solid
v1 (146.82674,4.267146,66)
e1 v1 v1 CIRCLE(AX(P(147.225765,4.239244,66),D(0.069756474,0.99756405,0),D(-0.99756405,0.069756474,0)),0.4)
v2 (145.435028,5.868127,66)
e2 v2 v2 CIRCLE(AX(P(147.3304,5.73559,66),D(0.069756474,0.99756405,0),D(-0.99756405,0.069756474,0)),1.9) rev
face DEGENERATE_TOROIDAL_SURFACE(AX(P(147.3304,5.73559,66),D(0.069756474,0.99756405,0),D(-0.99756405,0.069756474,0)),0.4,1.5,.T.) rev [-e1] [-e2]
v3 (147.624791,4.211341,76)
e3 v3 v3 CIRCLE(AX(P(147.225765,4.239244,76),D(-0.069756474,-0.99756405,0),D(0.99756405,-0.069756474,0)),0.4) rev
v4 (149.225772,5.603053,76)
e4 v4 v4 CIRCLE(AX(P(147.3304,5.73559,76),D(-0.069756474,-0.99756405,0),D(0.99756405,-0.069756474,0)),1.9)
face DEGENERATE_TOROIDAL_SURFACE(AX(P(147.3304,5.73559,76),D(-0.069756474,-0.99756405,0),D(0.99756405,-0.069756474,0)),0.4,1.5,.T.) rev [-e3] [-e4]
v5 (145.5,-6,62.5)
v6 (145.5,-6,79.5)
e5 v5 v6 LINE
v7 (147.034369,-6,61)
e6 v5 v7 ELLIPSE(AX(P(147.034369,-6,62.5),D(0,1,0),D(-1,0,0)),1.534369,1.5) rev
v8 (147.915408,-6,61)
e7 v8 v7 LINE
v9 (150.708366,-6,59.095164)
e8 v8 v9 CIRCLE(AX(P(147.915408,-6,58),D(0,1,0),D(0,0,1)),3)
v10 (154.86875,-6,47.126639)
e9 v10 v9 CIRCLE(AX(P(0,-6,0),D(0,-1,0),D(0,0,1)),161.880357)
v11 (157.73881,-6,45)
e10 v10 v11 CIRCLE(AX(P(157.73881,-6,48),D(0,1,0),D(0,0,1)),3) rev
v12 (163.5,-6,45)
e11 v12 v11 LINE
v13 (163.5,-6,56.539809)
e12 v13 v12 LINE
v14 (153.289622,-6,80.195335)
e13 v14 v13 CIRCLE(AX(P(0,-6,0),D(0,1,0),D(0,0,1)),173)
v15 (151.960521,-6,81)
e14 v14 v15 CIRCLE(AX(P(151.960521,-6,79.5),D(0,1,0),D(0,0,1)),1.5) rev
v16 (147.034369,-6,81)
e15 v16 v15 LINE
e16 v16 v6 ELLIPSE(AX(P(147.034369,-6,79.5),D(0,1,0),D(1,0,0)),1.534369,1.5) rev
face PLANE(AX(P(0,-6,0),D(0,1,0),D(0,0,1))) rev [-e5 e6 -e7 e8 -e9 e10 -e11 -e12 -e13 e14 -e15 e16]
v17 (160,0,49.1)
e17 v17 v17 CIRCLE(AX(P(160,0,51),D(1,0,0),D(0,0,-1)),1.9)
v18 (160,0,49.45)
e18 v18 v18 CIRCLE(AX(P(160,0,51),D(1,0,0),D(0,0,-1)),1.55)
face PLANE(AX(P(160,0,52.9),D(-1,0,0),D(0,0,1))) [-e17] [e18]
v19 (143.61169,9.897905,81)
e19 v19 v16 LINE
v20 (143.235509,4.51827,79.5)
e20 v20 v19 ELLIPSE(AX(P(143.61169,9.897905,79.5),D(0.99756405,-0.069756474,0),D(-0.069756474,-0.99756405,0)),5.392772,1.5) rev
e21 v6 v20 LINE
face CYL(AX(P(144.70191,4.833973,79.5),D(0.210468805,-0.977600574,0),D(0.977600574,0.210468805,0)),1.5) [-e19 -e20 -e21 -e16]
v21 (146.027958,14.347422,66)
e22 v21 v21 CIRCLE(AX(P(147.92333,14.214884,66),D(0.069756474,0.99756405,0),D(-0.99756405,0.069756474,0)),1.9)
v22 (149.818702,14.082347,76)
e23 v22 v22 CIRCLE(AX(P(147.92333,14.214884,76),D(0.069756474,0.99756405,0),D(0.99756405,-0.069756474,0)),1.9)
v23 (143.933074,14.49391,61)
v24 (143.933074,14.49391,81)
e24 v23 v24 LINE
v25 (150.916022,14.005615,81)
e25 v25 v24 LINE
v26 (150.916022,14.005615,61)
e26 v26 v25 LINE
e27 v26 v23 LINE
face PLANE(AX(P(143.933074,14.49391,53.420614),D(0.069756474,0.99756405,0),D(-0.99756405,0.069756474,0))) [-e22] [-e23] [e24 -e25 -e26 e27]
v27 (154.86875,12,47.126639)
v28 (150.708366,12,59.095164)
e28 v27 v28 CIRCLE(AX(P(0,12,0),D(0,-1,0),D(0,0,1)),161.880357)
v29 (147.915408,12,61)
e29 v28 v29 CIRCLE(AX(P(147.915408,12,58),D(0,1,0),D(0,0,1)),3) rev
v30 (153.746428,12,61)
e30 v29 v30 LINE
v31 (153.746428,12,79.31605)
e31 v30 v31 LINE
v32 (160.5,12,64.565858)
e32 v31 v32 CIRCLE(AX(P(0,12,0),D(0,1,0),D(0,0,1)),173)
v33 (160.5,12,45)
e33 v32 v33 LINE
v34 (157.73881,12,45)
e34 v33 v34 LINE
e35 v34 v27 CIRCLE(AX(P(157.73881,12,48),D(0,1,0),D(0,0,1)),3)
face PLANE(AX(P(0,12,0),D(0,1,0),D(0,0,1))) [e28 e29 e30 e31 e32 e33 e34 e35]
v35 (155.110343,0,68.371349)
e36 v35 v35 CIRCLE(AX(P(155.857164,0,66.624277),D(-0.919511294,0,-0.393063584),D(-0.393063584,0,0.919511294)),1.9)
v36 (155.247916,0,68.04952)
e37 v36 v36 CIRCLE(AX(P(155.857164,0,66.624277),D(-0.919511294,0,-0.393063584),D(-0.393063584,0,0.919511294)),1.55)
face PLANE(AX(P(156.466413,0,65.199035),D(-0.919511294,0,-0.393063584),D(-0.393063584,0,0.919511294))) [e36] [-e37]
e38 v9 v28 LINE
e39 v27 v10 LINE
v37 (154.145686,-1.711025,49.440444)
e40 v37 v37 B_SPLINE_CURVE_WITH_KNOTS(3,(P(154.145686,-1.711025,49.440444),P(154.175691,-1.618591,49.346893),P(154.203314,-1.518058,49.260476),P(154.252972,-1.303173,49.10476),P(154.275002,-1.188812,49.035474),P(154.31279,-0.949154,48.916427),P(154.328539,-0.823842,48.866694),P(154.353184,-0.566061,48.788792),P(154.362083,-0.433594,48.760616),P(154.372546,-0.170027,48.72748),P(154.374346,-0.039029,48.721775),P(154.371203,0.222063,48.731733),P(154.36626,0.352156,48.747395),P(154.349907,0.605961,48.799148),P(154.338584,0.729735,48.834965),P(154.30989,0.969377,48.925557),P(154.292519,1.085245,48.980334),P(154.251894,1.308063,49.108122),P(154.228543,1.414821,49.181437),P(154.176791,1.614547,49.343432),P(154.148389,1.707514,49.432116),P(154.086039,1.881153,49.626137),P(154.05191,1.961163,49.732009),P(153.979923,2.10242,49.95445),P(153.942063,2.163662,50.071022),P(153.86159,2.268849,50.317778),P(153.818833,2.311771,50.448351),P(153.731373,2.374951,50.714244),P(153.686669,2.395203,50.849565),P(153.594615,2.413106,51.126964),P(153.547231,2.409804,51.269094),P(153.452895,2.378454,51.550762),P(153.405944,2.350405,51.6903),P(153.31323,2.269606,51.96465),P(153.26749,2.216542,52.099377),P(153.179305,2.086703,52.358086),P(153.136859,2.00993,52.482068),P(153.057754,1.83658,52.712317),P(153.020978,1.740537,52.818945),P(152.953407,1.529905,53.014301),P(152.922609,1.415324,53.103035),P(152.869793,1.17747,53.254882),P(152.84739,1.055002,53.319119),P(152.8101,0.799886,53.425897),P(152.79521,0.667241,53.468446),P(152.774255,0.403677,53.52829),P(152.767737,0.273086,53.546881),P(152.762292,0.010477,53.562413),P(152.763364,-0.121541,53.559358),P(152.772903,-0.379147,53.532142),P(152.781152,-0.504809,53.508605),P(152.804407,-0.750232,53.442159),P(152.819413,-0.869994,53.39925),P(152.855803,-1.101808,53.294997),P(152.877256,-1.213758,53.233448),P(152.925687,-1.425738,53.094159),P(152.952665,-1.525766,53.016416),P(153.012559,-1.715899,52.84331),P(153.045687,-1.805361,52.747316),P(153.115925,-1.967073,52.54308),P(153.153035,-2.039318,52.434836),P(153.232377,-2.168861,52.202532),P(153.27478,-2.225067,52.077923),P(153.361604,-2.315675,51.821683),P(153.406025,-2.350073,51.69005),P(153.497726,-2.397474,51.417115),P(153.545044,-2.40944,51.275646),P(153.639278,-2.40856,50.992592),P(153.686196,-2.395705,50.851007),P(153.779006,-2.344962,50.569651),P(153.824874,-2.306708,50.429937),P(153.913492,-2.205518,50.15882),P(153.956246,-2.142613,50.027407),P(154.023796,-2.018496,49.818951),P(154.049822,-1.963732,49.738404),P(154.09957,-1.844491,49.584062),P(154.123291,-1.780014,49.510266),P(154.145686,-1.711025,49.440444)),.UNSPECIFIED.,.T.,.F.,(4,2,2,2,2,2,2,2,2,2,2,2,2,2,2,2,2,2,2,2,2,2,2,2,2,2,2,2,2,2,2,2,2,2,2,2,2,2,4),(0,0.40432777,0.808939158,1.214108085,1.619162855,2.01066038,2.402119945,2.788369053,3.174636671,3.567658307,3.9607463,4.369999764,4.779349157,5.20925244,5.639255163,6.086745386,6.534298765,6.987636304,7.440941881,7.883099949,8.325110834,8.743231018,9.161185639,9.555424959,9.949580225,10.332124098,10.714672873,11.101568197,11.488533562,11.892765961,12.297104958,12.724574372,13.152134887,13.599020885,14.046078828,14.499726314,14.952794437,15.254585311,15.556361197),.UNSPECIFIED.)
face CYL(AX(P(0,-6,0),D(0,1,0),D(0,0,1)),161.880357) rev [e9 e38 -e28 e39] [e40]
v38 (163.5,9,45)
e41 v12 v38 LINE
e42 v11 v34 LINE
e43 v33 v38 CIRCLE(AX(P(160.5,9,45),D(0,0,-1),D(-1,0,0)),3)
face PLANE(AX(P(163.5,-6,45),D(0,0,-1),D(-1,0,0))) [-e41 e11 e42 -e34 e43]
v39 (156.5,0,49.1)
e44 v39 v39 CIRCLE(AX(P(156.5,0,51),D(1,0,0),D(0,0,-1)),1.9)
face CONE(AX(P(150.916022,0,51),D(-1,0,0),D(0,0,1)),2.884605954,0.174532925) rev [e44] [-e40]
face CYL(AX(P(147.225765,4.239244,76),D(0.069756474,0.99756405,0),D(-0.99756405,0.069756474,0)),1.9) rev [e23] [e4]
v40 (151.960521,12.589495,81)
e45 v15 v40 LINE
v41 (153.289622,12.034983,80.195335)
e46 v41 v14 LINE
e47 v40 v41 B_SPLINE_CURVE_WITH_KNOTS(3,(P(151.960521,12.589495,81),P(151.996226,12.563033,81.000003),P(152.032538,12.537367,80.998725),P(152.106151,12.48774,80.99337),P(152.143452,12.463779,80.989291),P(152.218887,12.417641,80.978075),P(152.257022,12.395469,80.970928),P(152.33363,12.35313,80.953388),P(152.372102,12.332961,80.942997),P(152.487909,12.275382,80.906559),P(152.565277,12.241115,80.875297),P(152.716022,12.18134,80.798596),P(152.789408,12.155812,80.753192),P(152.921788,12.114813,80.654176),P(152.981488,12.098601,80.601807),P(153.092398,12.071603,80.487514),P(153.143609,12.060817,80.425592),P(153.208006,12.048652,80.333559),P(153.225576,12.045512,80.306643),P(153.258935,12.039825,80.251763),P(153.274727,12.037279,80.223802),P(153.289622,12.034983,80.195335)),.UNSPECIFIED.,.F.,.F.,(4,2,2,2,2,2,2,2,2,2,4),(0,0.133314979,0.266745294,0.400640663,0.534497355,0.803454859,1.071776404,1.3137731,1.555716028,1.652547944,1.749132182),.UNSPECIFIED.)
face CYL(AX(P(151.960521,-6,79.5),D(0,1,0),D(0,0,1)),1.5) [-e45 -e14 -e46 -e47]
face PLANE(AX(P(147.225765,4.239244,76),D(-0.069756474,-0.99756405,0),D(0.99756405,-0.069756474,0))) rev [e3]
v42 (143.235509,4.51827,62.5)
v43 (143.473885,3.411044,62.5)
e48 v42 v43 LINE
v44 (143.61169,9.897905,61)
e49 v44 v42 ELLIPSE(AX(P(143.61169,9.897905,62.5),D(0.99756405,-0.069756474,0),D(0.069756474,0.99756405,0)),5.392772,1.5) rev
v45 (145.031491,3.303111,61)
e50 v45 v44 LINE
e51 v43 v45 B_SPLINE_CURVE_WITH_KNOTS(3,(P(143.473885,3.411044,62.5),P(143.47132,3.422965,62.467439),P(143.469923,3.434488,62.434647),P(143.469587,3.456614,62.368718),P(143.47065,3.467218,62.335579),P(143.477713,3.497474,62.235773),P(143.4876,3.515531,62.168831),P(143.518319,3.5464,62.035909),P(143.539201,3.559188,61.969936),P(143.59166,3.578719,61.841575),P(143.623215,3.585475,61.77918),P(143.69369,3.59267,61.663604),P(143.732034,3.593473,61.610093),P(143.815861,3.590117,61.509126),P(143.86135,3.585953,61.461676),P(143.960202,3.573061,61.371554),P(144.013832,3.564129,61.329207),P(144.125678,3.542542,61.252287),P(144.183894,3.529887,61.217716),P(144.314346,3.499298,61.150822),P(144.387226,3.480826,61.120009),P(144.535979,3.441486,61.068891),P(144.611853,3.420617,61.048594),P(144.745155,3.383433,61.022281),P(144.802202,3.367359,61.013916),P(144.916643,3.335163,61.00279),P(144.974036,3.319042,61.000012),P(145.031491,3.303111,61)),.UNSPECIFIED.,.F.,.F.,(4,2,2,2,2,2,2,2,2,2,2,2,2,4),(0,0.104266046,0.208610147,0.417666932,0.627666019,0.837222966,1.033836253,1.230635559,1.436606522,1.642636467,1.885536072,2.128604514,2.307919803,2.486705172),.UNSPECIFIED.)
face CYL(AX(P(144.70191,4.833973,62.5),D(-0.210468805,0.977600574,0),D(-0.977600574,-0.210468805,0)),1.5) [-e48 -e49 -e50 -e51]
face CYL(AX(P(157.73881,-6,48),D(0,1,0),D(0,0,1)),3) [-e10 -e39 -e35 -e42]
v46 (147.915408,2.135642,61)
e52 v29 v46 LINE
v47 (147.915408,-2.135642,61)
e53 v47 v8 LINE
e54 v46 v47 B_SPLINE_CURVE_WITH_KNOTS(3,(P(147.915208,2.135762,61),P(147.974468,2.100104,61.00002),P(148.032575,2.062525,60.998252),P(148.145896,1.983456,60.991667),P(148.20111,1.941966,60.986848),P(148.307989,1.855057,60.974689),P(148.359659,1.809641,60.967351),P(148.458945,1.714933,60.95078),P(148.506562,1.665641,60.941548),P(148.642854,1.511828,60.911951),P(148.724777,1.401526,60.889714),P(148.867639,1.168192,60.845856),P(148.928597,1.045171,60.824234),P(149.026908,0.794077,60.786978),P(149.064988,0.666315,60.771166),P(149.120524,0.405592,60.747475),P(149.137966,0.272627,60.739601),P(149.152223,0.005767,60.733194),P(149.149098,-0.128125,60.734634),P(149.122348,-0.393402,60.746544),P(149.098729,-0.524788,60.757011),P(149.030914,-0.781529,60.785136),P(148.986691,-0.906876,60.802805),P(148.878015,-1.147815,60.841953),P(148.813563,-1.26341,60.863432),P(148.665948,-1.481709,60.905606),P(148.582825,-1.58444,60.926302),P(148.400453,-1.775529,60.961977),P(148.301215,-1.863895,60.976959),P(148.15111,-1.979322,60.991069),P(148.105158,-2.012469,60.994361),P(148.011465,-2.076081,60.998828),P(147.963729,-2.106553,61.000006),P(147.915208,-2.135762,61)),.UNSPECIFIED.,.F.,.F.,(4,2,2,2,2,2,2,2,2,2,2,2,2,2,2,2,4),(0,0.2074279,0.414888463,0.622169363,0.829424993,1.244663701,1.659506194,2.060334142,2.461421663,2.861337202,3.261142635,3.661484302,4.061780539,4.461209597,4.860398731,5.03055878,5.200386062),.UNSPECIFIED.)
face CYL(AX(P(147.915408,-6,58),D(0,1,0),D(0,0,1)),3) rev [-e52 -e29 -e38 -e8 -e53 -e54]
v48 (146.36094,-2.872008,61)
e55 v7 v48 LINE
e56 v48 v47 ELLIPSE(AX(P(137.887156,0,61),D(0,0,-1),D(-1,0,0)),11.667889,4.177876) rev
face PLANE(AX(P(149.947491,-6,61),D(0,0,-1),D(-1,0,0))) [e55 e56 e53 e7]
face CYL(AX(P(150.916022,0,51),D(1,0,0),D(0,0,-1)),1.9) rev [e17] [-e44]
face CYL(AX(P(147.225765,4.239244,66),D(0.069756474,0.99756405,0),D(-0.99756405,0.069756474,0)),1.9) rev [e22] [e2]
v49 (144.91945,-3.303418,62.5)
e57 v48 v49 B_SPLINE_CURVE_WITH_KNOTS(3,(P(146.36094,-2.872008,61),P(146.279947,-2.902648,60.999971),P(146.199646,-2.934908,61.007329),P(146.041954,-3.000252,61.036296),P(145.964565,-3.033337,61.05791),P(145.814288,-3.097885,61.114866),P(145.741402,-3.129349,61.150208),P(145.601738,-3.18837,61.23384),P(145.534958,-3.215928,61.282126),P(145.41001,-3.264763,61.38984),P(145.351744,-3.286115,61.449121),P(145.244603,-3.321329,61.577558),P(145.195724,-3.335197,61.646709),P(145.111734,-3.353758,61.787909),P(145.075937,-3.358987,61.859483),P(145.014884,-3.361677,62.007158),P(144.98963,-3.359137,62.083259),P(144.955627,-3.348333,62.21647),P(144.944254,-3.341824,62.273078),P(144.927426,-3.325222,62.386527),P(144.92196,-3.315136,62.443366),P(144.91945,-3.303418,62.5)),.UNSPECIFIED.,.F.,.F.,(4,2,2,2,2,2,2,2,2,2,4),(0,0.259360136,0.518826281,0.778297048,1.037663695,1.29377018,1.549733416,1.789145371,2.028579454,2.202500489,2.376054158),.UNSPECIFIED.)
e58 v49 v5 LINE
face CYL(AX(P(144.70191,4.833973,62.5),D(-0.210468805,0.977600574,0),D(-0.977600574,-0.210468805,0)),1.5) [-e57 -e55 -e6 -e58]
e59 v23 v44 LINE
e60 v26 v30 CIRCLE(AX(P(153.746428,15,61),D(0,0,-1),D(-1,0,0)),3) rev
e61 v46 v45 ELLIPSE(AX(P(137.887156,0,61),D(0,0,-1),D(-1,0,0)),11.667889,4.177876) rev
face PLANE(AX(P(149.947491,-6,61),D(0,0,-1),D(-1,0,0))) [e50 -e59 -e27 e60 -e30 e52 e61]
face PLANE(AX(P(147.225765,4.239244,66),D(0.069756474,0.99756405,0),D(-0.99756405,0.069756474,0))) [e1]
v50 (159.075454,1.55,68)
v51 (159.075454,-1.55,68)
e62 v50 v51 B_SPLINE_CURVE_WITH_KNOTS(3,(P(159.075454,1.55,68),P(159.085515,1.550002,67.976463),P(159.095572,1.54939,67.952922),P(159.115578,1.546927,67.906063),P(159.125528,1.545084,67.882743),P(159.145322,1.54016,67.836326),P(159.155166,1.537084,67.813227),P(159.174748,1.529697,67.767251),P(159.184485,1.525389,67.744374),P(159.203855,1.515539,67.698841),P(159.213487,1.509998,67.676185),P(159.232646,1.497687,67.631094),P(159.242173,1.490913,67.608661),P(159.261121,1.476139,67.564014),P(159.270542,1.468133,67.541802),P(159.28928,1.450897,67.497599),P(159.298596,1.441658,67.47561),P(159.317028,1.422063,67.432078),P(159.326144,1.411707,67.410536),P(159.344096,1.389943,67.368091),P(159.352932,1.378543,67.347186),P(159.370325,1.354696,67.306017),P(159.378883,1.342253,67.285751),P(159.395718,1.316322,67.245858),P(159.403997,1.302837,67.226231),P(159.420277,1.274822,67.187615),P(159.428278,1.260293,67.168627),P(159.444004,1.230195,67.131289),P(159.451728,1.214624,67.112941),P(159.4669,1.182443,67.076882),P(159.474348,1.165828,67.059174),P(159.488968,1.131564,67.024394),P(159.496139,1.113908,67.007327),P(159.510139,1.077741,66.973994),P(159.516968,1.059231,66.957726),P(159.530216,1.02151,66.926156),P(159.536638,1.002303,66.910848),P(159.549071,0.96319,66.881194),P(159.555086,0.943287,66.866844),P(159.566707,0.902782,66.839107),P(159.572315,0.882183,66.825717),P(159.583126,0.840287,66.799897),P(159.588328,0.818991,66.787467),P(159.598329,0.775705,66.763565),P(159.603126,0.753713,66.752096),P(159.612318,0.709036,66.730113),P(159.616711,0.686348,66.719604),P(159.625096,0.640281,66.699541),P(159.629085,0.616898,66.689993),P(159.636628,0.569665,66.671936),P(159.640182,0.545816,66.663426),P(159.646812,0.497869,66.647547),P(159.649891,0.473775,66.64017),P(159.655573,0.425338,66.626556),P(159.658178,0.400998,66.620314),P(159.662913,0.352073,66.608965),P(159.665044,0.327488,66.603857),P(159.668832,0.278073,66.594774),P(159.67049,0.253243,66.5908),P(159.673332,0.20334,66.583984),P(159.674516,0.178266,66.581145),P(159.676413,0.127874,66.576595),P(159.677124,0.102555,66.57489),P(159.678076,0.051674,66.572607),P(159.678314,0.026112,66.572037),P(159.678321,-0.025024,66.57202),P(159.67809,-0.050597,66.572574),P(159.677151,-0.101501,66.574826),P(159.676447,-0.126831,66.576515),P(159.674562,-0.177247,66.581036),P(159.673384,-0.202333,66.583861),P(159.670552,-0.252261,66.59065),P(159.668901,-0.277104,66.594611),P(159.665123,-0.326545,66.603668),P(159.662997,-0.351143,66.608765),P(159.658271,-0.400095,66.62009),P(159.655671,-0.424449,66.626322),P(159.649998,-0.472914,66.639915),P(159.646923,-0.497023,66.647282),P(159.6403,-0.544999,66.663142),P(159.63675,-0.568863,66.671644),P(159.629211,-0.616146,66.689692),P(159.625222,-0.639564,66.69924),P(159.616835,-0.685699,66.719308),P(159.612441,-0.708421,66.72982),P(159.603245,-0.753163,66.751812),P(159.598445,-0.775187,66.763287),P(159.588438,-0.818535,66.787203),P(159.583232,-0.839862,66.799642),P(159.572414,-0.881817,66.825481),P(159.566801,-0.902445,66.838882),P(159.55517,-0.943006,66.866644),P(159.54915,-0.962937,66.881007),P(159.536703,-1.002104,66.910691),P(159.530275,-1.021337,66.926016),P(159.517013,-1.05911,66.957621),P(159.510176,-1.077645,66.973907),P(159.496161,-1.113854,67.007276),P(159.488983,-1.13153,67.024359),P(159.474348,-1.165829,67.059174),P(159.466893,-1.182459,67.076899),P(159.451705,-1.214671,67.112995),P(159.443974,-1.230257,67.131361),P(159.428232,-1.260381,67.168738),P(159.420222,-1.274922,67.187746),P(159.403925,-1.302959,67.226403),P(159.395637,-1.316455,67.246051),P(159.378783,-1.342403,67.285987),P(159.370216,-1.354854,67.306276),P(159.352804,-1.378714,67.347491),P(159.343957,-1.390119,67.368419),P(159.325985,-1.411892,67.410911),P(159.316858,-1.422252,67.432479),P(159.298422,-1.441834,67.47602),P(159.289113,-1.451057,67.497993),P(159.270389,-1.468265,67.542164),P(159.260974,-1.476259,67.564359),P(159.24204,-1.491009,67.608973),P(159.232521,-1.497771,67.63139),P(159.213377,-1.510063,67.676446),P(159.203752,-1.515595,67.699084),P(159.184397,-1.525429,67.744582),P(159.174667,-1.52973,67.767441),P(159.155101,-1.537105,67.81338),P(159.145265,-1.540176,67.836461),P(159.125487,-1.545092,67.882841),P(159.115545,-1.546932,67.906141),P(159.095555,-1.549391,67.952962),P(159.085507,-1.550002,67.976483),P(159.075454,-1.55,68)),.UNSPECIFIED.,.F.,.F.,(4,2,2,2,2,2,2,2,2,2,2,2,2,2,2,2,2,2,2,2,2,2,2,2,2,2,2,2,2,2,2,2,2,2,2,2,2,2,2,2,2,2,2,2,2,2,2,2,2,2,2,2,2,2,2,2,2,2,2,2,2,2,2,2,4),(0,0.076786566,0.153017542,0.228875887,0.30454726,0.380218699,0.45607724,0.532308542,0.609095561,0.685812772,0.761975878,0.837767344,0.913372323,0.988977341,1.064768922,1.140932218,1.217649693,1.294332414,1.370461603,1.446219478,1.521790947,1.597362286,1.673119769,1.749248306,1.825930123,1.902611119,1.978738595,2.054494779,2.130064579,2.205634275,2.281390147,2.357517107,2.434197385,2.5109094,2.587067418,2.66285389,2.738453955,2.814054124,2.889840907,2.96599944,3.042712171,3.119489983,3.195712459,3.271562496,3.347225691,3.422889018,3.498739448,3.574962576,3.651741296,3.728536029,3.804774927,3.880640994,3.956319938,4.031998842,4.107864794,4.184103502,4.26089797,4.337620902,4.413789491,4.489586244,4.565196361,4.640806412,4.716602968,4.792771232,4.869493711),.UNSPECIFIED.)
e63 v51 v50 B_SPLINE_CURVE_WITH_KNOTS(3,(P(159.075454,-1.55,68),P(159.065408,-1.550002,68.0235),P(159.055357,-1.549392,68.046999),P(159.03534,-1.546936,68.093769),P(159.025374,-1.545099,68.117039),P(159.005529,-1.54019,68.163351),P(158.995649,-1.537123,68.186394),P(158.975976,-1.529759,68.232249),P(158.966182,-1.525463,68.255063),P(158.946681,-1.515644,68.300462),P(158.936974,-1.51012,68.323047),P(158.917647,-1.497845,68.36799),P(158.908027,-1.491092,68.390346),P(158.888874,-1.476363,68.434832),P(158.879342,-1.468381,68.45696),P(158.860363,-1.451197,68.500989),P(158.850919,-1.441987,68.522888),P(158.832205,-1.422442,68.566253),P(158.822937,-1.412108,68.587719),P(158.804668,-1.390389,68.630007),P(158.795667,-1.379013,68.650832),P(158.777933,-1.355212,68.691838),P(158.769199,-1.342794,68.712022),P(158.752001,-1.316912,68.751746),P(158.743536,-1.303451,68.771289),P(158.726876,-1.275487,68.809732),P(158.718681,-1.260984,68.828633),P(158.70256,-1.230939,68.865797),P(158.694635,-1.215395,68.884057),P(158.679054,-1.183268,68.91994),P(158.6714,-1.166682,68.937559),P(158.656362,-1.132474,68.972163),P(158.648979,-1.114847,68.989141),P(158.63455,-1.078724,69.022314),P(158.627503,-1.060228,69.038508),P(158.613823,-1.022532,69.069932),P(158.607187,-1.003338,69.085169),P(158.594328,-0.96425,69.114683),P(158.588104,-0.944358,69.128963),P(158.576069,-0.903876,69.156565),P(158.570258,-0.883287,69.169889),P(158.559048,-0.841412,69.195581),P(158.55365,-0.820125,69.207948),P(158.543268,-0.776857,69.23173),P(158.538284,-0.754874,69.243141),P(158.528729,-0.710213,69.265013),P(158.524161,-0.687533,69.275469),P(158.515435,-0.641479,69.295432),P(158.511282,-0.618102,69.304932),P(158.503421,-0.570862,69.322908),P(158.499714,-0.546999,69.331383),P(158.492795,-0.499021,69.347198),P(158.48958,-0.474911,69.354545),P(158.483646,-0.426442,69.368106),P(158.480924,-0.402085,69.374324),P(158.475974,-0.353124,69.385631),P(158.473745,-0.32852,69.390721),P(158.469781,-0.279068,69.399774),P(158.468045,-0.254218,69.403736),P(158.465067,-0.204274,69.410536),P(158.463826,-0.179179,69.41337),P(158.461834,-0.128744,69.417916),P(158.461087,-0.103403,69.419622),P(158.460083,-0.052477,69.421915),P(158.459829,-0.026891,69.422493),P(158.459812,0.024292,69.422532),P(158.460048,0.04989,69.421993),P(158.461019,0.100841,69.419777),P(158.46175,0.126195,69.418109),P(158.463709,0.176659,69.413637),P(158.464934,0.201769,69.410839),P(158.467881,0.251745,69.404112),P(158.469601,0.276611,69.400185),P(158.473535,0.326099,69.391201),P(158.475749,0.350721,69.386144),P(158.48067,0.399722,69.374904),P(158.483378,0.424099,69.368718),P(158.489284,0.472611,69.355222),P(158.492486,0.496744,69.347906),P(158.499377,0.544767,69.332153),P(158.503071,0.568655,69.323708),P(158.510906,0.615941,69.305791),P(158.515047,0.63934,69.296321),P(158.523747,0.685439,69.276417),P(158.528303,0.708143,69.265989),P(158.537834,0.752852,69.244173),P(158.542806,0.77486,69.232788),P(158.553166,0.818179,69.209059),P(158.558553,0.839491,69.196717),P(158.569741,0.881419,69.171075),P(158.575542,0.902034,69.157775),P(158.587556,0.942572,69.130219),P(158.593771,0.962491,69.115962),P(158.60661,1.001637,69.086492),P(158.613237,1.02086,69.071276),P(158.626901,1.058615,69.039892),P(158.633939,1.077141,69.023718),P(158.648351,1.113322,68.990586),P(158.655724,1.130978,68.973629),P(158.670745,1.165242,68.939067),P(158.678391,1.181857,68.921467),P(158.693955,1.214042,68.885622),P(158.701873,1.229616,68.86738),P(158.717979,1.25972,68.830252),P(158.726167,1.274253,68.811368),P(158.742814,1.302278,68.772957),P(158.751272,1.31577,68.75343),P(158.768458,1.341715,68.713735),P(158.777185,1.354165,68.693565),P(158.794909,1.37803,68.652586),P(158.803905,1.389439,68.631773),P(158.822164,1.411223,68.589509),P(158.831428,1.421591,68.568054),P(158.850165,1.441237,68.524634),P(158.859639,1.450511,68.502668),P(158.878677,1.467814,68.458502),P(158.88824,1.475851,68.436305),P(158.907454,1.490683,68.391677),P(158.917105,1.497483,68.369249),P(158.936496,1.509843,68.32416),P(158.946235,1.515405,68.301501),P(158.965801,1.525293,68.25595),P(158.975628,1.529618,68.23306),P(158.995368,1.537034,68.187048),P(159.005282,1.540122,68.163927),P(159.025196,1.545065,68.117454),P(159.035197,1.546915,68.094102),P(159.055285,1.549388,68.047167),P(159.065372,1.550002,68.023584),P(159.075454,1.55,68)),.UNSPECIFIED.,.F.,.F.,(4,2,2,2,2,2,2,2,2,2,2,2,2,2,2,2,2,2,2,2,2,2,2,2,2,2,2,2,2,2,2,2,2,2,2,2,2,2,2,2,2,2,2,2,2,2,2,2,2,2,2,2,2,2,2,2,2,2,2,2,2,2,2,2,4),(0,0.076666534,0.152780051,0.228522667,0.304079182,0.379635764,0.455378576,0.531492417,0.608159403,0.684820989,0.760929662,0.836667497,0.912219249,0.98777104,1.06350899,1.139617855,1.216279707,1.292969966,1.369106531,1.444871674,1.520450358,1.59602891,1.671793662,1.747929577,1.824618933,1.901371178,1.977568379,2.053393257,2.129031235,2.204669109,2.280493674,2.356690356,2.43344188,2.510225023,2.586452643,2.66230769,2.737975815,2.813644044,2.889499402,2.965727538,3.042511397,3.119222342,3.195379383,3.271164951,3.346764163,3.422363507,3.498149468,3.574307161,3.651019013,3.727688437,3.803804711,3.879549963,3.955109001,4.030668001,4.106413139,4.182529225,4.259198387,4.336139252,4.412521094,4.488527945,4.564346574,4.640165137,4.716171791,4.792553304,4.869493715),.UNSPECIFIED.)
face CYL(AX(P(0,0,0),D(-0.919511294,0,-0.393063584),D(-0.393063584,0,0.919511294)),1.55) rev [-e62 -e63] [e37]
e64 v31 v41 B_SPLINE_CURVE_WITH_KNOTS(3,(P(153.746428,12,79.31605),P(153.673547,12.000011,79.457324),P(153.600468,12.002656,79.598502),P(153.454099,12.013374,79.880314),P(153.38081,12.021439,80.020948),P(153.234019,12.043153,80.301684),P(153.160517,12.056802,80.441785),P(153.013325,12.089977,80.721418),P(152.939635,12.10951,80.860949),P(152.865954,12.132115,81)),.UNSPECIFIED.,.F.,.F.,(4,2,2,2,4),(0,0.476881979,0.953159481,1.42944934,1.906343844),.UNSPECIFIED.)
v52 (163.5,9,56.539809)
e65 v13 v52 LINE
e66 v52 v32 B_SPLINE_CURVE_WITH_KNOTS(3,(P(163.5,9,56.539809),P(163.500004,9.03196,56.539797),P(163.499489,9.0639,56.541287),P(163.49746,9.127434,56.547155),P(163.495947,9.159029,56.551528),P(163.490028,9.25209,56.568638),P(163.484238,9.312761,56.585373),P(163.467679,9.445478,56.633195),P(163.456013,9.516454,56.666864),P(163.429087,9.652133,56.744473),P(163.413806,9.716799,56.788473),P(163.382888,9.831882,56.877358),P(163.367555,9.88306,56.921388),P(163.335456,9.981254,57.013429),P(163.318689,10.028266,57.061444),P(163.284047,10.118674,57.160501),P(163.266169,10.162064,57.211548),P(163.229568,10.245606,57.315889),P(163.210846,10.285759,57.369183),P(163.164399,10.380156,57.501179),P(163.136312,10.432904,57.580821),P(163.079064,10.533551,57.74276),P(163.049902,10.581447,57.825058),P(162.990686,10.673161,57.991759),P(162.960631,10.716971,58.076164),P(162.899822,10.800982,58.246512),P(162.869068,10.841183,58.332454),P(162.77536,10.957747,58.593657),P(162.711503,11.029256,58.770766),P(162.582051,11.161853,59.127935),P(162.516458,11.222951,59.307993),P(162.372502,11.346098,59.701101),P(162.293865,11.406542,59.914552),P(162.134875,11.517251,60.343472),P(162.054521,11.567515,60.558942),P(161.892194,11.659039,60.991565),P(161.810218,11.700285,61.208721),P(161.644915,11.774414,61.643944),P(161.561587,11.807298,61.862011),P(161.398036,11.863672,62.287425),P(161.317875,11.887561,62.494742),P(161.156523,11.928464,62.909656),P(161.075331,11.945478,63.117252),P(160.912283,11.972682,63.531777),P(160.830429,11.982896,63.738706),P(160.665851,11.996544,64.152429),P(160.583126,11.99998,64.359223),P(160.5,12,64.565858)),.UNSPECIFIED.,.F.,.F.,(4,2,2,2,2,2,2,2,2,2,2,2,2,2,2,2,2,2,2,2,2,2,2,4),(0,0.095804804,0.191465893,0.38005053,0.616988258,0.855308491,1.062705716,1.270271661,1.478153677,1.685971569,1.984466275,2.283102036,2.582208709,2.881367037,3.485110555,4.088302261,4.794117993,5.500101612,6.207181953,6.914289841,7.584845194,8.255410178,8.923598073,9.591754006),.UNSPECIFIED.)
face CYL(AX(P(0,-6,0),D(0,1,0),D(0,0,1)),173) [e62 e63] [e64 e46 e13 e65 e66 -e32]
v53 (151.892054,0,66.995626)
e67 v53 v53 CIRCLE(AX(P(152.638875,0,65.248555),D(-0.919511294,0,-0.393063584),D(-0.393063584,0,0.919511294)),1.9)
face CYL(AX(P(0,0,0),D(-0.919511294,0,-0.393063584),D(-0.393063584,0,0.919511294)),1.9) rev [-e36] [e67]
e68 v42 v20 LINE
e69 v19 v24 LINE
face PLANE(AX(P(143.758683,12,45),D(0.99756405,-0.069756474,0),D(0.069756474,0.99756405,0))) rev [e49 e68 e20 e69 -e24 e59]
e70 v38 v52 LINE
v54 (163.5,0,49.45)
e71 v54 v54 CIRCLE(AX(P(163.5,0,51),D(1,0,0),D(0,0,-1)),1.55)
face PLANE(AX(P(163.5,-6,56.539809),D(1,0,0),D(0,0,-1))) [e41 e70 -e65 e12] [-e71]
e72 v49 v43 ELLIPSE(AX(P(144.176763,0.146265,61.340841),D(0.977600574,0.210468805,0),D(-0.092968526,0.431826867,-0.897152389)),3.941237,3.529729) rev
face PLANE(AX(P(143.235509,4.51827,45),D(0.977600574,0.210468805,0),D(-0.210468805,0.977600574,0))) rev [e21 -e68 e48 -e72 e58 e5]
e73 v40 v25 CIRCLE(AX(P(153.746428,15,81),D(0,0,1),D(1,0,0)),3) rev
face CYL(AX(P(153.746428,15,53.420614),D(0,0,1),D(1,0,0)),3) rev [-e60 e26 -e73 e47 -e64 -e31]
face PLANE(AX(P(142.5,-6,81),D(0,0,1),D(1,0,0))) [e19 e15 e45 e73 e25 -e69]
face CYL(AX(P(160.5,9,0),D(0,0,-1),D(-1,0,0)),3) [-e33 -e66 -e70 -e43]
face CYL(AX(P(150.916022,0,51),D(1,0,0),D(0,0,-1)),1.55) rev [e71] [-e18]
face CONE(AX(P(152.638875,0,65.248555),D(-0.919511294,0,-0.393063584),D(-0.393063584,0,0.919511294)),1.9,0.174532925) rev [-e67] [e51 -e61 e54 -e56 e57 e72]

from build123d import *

# Parameters (mm, degrees)
BOSS_EXTRU_1_DEPTH      = 12
BOSS_EXTRU_1_DEPTH_BACK = 6
ENL_V_MAT_EXTRU_1_DEPTH = 168.845911478
BOSS_EXTRU_2_DEPTH      = 20
ENL_V_MAT_EXTRU_2_DEPTH = 169.042623851
ESQUISSE5_R             = 1.9
ENL_V_MAT_EXTRU_3_DEPTH = 10
CONG_1_R                = 3
CONG_2_R                = 1.5


with BuildPart() as part:
    # Esquisse1 → Boss.-Extru.1 (new, two sides: drawn at the far end of the back side and taken through both)
    with BuildSketch(Plane(origin=(0, 0, 0), x_dir=(1, 0, 0), z_dir=(0, 1, 0)).offset(-BOSS_EXTRU_1_DEPTH_BACK)):
        with BuildLine():
            Line((142.5, -81), (152.865954352, -81))
            ThreePointArc((152.865954352, -81), (158.655064541, -68.975144042), (163.5, -56.539808984))
            Line((163.5, -56.539808984), (163.5, -45))
            Line((163.5, -45), (155.5, -45))
            ThreePointArc((155.5, -45), (152.933130519, -53.072663298), (149.947490809, -61))
            Line((149.947490809, -61), (142.5, -61))
            Line((142.5, -61), (142.5, -81))
        make_face()
    extrude(amount=BOSS_EXTRU_1_DEPTH + BOSS_EXTRU_1_DEPTH_BACK)

    # Esquisse2 → Enlèv. mat.-Extru.1 (cut, through all)
    with BuildSketch(Plane.XY.offset(81)):
        Polygon((142.5, -6), (142.5, 12), (143.758682615, 12), align=None)
    extrude(amount=-ENL_V_MAT_EXTRU_1_DEPTH, mode=Mode.SUBTRACT)

    # Esquisse3 → Boss.-Extru.2 (add)
    with BuildSketch(Plane.XY.offset(81)):
        Polygon((143.758682615, 12), (143.933073799, 14.493910126), (150.916022151, 14.005614809), (150.916022151, 12), align=None)
    extrude(amount=-BOSS_EXTRU_2_DEPTH)

    # Esquisse4 → Enlèv. mat.-Extru.2 (cut, through all)
    with BuildSketch(Plane.XY.offset(81)):
        Polygon((142.5, -6), (143.235509062, 4.518269623), (145.5, -6), align=None)
    extrude(amount=-ENL_V_MAT_EXTRU_2_DEPTH, mode=Mode.SUBTRACT)

    # Esquisse5 → Enlèv. mat.-Extru.3 (cut)
    with BuildSketch(Plane(origin=(1.708954599, 24.439189363, 0), x_dir=(0.9975640502598248, -0.06975647374411768, 0), z_dir=(0.06975647374411768, 0.9975640502598248, 0))):
        with Locations(Location((146.571416004, -66, 0), (0, 0, 180))):
            Circle(ESQUISSE5_R)
        with Locations((146.571416004, -76)):
            Circle(ESQUISSE5_R)
    extrude(amount=-ENL_V_MAT_EXTRU_3_DEPTH, mode=Mode.SUBTRACT)

    # Esquisse7 → Enlèvement de matière-Révolution1 (revolve, cut)
    with BuildSketch(Plane(origin=(0, 0, 0), x_dir=(1, 0, 0), z_dir=(0, 1, 0)), mode=Mode.PRIVATE) as enl_vement_de_mati_re_r_volution1_sk:
        Polygon((156.5, -52.9), (160, -52.9), (160, -52.55), (163.5, -52.55), (163.5, -51), (150.916022151, -51), (150.916022151, -53.884605954), align=None)
    revolve(enl_vement_de_mati_re_r_volution1_sk.sketch.rotate(Axis((150.916022151, 0, 51), (-1, 0, 0)), 180), axis=Axis((150.916022151, 0, 51), (-1, 0, 0)), mode=Mode.SUBTRACT)

    # Congé1
    # the kernel refuses this fillet: 3 mm, written as the material it adds along each edge
    with BuildSketch(Plane(origin=(150.916022151, 12, 81), x_dir=(0, 1, 0), z_dir=(0, 0, -1))) as cong_1_piece_1_section:
        with BuildLine():
            CenterArc((3, 2.830405994), CONG_1_R, 180, 70.642479406)
            Line((0, 2.830405994), (0, 0))
            Line((0, 0), (2.005614809, 0))
        make_face()
    cong_1_piece_1 = extrude(amount=20, mode=Mode.PRIVATE)
    cong_1_piece_1 = cong_1_piece_1 & Plane(origin=(0, 12, 0), x_dir=(0.8836182332495415, 0, 0.46820809248555173), z_dir=(0, -1, 0)) * Cylinder(173, 52, mode=Mode.PRIVATE)
    add(cong_1_piece_1)
    with BuildSketch(Plane(origin=(149.947490809, 12, 61), x_dir=(-1, 0, 0), z_dir=(0, -1, 0))) as cong_1_piece_2:
        with BuildLine():
            CenterArc((2.032083033, 3), CONG_1_R, 201.410940908, 68.589059092)
            ThreePointArc((-0.760875339, 1.904836298), (-0.383454711, 0.95121301), (0, 0))
            Line((0, 0), (2.032083033, 0))
        make_face()
    extrude(amount=18)
    # the kernel refuses this fillet: 3 mm, written as the material it takes off along each edge
    with BuildSketch(Plane(origin=(163.5, 12, 69.289808984), x_dir=(0, -1, 0), z_dir=(0, 0, -1))) as cong_1_2_piece_1:
        with BuildLine():
            CenterArc((CONG_1_R, CONG_1_R), CONG_1_R, 180, 90)
            Line((0, CONG_1_R), (0, 0))
            Line((0, 0), (CONG_1_R, 0))
        make_face()
    extrude(amount=31.789808984, mode=Mode.SUBTRACT)
    with BuildSketch(Plane(origin=(155.5, 17.5970247, 45), x_dir=(-0.2845583113069487, 0, 0.9586587335783978), z_dir=(0, -1, 0))) as cong_1_2_piece_2:
        with BuildLine():
            CenterArc((2.238904242, -2.999929578), CONG_1_R, 90.392583202, 73.074968252)
            Line((-0.637071959, -2.146254644), (0, 0))
            ThreePointArc((0, 0), (1.109174397, -0.003799974), (2.218348794, 0))
        make_face()
    extrude(amount=29.194049399, mode=Mode.SUBTRACT)

    # Esquisse8 → Enlèvement de matière-Révolution2 (revolve, cut)
    with BuildSketch(Plane(origin=(0, 0, 0), x_dir=(1, 0, 0), z_dir=(0, 1, 0)), mode=Mode.PRIVATE) as enl_vement_de_mati_re_r_volution2_sk:
        Polygon((143.15277955, -61.193532862), (159.075453795, -68), (159.68470235, -66.574757495), (156.466412822, -65.199034952), (156.603985076, -64.877205999), (153.385695549, -63.501483455), (144.614610154, -57.773806881), align=None)
    revolve(enl_vement_de_mati_re_r_volution2_sk.sketch.rotate(Axis((0, 0, 0), (0.9195112936111692, 0, 0.3930635838150288)), 180), axis=Axis((0, 0, 0), (0.9195112936111692, 0, 0.3930635838150288)), mode=Mode.SUBTRACT)

    # Congé2
    cong_2_edges = [part.edges().sort_by_distance(p)[0] for p in [
        (145.330393567, 4.371781028, 76),
        (149.121136958, 4.106706428, 66),
        (143.325850505, 4.098645221, 61),
        (144.367754531, -0.740865188, 81),
        (145.212814743, -4.66606136, 61),
        (152.865954352, 3, 81),
    ]]
    fillet(cong_2_edges, radius=CONG_2_R)


solid = part.part
